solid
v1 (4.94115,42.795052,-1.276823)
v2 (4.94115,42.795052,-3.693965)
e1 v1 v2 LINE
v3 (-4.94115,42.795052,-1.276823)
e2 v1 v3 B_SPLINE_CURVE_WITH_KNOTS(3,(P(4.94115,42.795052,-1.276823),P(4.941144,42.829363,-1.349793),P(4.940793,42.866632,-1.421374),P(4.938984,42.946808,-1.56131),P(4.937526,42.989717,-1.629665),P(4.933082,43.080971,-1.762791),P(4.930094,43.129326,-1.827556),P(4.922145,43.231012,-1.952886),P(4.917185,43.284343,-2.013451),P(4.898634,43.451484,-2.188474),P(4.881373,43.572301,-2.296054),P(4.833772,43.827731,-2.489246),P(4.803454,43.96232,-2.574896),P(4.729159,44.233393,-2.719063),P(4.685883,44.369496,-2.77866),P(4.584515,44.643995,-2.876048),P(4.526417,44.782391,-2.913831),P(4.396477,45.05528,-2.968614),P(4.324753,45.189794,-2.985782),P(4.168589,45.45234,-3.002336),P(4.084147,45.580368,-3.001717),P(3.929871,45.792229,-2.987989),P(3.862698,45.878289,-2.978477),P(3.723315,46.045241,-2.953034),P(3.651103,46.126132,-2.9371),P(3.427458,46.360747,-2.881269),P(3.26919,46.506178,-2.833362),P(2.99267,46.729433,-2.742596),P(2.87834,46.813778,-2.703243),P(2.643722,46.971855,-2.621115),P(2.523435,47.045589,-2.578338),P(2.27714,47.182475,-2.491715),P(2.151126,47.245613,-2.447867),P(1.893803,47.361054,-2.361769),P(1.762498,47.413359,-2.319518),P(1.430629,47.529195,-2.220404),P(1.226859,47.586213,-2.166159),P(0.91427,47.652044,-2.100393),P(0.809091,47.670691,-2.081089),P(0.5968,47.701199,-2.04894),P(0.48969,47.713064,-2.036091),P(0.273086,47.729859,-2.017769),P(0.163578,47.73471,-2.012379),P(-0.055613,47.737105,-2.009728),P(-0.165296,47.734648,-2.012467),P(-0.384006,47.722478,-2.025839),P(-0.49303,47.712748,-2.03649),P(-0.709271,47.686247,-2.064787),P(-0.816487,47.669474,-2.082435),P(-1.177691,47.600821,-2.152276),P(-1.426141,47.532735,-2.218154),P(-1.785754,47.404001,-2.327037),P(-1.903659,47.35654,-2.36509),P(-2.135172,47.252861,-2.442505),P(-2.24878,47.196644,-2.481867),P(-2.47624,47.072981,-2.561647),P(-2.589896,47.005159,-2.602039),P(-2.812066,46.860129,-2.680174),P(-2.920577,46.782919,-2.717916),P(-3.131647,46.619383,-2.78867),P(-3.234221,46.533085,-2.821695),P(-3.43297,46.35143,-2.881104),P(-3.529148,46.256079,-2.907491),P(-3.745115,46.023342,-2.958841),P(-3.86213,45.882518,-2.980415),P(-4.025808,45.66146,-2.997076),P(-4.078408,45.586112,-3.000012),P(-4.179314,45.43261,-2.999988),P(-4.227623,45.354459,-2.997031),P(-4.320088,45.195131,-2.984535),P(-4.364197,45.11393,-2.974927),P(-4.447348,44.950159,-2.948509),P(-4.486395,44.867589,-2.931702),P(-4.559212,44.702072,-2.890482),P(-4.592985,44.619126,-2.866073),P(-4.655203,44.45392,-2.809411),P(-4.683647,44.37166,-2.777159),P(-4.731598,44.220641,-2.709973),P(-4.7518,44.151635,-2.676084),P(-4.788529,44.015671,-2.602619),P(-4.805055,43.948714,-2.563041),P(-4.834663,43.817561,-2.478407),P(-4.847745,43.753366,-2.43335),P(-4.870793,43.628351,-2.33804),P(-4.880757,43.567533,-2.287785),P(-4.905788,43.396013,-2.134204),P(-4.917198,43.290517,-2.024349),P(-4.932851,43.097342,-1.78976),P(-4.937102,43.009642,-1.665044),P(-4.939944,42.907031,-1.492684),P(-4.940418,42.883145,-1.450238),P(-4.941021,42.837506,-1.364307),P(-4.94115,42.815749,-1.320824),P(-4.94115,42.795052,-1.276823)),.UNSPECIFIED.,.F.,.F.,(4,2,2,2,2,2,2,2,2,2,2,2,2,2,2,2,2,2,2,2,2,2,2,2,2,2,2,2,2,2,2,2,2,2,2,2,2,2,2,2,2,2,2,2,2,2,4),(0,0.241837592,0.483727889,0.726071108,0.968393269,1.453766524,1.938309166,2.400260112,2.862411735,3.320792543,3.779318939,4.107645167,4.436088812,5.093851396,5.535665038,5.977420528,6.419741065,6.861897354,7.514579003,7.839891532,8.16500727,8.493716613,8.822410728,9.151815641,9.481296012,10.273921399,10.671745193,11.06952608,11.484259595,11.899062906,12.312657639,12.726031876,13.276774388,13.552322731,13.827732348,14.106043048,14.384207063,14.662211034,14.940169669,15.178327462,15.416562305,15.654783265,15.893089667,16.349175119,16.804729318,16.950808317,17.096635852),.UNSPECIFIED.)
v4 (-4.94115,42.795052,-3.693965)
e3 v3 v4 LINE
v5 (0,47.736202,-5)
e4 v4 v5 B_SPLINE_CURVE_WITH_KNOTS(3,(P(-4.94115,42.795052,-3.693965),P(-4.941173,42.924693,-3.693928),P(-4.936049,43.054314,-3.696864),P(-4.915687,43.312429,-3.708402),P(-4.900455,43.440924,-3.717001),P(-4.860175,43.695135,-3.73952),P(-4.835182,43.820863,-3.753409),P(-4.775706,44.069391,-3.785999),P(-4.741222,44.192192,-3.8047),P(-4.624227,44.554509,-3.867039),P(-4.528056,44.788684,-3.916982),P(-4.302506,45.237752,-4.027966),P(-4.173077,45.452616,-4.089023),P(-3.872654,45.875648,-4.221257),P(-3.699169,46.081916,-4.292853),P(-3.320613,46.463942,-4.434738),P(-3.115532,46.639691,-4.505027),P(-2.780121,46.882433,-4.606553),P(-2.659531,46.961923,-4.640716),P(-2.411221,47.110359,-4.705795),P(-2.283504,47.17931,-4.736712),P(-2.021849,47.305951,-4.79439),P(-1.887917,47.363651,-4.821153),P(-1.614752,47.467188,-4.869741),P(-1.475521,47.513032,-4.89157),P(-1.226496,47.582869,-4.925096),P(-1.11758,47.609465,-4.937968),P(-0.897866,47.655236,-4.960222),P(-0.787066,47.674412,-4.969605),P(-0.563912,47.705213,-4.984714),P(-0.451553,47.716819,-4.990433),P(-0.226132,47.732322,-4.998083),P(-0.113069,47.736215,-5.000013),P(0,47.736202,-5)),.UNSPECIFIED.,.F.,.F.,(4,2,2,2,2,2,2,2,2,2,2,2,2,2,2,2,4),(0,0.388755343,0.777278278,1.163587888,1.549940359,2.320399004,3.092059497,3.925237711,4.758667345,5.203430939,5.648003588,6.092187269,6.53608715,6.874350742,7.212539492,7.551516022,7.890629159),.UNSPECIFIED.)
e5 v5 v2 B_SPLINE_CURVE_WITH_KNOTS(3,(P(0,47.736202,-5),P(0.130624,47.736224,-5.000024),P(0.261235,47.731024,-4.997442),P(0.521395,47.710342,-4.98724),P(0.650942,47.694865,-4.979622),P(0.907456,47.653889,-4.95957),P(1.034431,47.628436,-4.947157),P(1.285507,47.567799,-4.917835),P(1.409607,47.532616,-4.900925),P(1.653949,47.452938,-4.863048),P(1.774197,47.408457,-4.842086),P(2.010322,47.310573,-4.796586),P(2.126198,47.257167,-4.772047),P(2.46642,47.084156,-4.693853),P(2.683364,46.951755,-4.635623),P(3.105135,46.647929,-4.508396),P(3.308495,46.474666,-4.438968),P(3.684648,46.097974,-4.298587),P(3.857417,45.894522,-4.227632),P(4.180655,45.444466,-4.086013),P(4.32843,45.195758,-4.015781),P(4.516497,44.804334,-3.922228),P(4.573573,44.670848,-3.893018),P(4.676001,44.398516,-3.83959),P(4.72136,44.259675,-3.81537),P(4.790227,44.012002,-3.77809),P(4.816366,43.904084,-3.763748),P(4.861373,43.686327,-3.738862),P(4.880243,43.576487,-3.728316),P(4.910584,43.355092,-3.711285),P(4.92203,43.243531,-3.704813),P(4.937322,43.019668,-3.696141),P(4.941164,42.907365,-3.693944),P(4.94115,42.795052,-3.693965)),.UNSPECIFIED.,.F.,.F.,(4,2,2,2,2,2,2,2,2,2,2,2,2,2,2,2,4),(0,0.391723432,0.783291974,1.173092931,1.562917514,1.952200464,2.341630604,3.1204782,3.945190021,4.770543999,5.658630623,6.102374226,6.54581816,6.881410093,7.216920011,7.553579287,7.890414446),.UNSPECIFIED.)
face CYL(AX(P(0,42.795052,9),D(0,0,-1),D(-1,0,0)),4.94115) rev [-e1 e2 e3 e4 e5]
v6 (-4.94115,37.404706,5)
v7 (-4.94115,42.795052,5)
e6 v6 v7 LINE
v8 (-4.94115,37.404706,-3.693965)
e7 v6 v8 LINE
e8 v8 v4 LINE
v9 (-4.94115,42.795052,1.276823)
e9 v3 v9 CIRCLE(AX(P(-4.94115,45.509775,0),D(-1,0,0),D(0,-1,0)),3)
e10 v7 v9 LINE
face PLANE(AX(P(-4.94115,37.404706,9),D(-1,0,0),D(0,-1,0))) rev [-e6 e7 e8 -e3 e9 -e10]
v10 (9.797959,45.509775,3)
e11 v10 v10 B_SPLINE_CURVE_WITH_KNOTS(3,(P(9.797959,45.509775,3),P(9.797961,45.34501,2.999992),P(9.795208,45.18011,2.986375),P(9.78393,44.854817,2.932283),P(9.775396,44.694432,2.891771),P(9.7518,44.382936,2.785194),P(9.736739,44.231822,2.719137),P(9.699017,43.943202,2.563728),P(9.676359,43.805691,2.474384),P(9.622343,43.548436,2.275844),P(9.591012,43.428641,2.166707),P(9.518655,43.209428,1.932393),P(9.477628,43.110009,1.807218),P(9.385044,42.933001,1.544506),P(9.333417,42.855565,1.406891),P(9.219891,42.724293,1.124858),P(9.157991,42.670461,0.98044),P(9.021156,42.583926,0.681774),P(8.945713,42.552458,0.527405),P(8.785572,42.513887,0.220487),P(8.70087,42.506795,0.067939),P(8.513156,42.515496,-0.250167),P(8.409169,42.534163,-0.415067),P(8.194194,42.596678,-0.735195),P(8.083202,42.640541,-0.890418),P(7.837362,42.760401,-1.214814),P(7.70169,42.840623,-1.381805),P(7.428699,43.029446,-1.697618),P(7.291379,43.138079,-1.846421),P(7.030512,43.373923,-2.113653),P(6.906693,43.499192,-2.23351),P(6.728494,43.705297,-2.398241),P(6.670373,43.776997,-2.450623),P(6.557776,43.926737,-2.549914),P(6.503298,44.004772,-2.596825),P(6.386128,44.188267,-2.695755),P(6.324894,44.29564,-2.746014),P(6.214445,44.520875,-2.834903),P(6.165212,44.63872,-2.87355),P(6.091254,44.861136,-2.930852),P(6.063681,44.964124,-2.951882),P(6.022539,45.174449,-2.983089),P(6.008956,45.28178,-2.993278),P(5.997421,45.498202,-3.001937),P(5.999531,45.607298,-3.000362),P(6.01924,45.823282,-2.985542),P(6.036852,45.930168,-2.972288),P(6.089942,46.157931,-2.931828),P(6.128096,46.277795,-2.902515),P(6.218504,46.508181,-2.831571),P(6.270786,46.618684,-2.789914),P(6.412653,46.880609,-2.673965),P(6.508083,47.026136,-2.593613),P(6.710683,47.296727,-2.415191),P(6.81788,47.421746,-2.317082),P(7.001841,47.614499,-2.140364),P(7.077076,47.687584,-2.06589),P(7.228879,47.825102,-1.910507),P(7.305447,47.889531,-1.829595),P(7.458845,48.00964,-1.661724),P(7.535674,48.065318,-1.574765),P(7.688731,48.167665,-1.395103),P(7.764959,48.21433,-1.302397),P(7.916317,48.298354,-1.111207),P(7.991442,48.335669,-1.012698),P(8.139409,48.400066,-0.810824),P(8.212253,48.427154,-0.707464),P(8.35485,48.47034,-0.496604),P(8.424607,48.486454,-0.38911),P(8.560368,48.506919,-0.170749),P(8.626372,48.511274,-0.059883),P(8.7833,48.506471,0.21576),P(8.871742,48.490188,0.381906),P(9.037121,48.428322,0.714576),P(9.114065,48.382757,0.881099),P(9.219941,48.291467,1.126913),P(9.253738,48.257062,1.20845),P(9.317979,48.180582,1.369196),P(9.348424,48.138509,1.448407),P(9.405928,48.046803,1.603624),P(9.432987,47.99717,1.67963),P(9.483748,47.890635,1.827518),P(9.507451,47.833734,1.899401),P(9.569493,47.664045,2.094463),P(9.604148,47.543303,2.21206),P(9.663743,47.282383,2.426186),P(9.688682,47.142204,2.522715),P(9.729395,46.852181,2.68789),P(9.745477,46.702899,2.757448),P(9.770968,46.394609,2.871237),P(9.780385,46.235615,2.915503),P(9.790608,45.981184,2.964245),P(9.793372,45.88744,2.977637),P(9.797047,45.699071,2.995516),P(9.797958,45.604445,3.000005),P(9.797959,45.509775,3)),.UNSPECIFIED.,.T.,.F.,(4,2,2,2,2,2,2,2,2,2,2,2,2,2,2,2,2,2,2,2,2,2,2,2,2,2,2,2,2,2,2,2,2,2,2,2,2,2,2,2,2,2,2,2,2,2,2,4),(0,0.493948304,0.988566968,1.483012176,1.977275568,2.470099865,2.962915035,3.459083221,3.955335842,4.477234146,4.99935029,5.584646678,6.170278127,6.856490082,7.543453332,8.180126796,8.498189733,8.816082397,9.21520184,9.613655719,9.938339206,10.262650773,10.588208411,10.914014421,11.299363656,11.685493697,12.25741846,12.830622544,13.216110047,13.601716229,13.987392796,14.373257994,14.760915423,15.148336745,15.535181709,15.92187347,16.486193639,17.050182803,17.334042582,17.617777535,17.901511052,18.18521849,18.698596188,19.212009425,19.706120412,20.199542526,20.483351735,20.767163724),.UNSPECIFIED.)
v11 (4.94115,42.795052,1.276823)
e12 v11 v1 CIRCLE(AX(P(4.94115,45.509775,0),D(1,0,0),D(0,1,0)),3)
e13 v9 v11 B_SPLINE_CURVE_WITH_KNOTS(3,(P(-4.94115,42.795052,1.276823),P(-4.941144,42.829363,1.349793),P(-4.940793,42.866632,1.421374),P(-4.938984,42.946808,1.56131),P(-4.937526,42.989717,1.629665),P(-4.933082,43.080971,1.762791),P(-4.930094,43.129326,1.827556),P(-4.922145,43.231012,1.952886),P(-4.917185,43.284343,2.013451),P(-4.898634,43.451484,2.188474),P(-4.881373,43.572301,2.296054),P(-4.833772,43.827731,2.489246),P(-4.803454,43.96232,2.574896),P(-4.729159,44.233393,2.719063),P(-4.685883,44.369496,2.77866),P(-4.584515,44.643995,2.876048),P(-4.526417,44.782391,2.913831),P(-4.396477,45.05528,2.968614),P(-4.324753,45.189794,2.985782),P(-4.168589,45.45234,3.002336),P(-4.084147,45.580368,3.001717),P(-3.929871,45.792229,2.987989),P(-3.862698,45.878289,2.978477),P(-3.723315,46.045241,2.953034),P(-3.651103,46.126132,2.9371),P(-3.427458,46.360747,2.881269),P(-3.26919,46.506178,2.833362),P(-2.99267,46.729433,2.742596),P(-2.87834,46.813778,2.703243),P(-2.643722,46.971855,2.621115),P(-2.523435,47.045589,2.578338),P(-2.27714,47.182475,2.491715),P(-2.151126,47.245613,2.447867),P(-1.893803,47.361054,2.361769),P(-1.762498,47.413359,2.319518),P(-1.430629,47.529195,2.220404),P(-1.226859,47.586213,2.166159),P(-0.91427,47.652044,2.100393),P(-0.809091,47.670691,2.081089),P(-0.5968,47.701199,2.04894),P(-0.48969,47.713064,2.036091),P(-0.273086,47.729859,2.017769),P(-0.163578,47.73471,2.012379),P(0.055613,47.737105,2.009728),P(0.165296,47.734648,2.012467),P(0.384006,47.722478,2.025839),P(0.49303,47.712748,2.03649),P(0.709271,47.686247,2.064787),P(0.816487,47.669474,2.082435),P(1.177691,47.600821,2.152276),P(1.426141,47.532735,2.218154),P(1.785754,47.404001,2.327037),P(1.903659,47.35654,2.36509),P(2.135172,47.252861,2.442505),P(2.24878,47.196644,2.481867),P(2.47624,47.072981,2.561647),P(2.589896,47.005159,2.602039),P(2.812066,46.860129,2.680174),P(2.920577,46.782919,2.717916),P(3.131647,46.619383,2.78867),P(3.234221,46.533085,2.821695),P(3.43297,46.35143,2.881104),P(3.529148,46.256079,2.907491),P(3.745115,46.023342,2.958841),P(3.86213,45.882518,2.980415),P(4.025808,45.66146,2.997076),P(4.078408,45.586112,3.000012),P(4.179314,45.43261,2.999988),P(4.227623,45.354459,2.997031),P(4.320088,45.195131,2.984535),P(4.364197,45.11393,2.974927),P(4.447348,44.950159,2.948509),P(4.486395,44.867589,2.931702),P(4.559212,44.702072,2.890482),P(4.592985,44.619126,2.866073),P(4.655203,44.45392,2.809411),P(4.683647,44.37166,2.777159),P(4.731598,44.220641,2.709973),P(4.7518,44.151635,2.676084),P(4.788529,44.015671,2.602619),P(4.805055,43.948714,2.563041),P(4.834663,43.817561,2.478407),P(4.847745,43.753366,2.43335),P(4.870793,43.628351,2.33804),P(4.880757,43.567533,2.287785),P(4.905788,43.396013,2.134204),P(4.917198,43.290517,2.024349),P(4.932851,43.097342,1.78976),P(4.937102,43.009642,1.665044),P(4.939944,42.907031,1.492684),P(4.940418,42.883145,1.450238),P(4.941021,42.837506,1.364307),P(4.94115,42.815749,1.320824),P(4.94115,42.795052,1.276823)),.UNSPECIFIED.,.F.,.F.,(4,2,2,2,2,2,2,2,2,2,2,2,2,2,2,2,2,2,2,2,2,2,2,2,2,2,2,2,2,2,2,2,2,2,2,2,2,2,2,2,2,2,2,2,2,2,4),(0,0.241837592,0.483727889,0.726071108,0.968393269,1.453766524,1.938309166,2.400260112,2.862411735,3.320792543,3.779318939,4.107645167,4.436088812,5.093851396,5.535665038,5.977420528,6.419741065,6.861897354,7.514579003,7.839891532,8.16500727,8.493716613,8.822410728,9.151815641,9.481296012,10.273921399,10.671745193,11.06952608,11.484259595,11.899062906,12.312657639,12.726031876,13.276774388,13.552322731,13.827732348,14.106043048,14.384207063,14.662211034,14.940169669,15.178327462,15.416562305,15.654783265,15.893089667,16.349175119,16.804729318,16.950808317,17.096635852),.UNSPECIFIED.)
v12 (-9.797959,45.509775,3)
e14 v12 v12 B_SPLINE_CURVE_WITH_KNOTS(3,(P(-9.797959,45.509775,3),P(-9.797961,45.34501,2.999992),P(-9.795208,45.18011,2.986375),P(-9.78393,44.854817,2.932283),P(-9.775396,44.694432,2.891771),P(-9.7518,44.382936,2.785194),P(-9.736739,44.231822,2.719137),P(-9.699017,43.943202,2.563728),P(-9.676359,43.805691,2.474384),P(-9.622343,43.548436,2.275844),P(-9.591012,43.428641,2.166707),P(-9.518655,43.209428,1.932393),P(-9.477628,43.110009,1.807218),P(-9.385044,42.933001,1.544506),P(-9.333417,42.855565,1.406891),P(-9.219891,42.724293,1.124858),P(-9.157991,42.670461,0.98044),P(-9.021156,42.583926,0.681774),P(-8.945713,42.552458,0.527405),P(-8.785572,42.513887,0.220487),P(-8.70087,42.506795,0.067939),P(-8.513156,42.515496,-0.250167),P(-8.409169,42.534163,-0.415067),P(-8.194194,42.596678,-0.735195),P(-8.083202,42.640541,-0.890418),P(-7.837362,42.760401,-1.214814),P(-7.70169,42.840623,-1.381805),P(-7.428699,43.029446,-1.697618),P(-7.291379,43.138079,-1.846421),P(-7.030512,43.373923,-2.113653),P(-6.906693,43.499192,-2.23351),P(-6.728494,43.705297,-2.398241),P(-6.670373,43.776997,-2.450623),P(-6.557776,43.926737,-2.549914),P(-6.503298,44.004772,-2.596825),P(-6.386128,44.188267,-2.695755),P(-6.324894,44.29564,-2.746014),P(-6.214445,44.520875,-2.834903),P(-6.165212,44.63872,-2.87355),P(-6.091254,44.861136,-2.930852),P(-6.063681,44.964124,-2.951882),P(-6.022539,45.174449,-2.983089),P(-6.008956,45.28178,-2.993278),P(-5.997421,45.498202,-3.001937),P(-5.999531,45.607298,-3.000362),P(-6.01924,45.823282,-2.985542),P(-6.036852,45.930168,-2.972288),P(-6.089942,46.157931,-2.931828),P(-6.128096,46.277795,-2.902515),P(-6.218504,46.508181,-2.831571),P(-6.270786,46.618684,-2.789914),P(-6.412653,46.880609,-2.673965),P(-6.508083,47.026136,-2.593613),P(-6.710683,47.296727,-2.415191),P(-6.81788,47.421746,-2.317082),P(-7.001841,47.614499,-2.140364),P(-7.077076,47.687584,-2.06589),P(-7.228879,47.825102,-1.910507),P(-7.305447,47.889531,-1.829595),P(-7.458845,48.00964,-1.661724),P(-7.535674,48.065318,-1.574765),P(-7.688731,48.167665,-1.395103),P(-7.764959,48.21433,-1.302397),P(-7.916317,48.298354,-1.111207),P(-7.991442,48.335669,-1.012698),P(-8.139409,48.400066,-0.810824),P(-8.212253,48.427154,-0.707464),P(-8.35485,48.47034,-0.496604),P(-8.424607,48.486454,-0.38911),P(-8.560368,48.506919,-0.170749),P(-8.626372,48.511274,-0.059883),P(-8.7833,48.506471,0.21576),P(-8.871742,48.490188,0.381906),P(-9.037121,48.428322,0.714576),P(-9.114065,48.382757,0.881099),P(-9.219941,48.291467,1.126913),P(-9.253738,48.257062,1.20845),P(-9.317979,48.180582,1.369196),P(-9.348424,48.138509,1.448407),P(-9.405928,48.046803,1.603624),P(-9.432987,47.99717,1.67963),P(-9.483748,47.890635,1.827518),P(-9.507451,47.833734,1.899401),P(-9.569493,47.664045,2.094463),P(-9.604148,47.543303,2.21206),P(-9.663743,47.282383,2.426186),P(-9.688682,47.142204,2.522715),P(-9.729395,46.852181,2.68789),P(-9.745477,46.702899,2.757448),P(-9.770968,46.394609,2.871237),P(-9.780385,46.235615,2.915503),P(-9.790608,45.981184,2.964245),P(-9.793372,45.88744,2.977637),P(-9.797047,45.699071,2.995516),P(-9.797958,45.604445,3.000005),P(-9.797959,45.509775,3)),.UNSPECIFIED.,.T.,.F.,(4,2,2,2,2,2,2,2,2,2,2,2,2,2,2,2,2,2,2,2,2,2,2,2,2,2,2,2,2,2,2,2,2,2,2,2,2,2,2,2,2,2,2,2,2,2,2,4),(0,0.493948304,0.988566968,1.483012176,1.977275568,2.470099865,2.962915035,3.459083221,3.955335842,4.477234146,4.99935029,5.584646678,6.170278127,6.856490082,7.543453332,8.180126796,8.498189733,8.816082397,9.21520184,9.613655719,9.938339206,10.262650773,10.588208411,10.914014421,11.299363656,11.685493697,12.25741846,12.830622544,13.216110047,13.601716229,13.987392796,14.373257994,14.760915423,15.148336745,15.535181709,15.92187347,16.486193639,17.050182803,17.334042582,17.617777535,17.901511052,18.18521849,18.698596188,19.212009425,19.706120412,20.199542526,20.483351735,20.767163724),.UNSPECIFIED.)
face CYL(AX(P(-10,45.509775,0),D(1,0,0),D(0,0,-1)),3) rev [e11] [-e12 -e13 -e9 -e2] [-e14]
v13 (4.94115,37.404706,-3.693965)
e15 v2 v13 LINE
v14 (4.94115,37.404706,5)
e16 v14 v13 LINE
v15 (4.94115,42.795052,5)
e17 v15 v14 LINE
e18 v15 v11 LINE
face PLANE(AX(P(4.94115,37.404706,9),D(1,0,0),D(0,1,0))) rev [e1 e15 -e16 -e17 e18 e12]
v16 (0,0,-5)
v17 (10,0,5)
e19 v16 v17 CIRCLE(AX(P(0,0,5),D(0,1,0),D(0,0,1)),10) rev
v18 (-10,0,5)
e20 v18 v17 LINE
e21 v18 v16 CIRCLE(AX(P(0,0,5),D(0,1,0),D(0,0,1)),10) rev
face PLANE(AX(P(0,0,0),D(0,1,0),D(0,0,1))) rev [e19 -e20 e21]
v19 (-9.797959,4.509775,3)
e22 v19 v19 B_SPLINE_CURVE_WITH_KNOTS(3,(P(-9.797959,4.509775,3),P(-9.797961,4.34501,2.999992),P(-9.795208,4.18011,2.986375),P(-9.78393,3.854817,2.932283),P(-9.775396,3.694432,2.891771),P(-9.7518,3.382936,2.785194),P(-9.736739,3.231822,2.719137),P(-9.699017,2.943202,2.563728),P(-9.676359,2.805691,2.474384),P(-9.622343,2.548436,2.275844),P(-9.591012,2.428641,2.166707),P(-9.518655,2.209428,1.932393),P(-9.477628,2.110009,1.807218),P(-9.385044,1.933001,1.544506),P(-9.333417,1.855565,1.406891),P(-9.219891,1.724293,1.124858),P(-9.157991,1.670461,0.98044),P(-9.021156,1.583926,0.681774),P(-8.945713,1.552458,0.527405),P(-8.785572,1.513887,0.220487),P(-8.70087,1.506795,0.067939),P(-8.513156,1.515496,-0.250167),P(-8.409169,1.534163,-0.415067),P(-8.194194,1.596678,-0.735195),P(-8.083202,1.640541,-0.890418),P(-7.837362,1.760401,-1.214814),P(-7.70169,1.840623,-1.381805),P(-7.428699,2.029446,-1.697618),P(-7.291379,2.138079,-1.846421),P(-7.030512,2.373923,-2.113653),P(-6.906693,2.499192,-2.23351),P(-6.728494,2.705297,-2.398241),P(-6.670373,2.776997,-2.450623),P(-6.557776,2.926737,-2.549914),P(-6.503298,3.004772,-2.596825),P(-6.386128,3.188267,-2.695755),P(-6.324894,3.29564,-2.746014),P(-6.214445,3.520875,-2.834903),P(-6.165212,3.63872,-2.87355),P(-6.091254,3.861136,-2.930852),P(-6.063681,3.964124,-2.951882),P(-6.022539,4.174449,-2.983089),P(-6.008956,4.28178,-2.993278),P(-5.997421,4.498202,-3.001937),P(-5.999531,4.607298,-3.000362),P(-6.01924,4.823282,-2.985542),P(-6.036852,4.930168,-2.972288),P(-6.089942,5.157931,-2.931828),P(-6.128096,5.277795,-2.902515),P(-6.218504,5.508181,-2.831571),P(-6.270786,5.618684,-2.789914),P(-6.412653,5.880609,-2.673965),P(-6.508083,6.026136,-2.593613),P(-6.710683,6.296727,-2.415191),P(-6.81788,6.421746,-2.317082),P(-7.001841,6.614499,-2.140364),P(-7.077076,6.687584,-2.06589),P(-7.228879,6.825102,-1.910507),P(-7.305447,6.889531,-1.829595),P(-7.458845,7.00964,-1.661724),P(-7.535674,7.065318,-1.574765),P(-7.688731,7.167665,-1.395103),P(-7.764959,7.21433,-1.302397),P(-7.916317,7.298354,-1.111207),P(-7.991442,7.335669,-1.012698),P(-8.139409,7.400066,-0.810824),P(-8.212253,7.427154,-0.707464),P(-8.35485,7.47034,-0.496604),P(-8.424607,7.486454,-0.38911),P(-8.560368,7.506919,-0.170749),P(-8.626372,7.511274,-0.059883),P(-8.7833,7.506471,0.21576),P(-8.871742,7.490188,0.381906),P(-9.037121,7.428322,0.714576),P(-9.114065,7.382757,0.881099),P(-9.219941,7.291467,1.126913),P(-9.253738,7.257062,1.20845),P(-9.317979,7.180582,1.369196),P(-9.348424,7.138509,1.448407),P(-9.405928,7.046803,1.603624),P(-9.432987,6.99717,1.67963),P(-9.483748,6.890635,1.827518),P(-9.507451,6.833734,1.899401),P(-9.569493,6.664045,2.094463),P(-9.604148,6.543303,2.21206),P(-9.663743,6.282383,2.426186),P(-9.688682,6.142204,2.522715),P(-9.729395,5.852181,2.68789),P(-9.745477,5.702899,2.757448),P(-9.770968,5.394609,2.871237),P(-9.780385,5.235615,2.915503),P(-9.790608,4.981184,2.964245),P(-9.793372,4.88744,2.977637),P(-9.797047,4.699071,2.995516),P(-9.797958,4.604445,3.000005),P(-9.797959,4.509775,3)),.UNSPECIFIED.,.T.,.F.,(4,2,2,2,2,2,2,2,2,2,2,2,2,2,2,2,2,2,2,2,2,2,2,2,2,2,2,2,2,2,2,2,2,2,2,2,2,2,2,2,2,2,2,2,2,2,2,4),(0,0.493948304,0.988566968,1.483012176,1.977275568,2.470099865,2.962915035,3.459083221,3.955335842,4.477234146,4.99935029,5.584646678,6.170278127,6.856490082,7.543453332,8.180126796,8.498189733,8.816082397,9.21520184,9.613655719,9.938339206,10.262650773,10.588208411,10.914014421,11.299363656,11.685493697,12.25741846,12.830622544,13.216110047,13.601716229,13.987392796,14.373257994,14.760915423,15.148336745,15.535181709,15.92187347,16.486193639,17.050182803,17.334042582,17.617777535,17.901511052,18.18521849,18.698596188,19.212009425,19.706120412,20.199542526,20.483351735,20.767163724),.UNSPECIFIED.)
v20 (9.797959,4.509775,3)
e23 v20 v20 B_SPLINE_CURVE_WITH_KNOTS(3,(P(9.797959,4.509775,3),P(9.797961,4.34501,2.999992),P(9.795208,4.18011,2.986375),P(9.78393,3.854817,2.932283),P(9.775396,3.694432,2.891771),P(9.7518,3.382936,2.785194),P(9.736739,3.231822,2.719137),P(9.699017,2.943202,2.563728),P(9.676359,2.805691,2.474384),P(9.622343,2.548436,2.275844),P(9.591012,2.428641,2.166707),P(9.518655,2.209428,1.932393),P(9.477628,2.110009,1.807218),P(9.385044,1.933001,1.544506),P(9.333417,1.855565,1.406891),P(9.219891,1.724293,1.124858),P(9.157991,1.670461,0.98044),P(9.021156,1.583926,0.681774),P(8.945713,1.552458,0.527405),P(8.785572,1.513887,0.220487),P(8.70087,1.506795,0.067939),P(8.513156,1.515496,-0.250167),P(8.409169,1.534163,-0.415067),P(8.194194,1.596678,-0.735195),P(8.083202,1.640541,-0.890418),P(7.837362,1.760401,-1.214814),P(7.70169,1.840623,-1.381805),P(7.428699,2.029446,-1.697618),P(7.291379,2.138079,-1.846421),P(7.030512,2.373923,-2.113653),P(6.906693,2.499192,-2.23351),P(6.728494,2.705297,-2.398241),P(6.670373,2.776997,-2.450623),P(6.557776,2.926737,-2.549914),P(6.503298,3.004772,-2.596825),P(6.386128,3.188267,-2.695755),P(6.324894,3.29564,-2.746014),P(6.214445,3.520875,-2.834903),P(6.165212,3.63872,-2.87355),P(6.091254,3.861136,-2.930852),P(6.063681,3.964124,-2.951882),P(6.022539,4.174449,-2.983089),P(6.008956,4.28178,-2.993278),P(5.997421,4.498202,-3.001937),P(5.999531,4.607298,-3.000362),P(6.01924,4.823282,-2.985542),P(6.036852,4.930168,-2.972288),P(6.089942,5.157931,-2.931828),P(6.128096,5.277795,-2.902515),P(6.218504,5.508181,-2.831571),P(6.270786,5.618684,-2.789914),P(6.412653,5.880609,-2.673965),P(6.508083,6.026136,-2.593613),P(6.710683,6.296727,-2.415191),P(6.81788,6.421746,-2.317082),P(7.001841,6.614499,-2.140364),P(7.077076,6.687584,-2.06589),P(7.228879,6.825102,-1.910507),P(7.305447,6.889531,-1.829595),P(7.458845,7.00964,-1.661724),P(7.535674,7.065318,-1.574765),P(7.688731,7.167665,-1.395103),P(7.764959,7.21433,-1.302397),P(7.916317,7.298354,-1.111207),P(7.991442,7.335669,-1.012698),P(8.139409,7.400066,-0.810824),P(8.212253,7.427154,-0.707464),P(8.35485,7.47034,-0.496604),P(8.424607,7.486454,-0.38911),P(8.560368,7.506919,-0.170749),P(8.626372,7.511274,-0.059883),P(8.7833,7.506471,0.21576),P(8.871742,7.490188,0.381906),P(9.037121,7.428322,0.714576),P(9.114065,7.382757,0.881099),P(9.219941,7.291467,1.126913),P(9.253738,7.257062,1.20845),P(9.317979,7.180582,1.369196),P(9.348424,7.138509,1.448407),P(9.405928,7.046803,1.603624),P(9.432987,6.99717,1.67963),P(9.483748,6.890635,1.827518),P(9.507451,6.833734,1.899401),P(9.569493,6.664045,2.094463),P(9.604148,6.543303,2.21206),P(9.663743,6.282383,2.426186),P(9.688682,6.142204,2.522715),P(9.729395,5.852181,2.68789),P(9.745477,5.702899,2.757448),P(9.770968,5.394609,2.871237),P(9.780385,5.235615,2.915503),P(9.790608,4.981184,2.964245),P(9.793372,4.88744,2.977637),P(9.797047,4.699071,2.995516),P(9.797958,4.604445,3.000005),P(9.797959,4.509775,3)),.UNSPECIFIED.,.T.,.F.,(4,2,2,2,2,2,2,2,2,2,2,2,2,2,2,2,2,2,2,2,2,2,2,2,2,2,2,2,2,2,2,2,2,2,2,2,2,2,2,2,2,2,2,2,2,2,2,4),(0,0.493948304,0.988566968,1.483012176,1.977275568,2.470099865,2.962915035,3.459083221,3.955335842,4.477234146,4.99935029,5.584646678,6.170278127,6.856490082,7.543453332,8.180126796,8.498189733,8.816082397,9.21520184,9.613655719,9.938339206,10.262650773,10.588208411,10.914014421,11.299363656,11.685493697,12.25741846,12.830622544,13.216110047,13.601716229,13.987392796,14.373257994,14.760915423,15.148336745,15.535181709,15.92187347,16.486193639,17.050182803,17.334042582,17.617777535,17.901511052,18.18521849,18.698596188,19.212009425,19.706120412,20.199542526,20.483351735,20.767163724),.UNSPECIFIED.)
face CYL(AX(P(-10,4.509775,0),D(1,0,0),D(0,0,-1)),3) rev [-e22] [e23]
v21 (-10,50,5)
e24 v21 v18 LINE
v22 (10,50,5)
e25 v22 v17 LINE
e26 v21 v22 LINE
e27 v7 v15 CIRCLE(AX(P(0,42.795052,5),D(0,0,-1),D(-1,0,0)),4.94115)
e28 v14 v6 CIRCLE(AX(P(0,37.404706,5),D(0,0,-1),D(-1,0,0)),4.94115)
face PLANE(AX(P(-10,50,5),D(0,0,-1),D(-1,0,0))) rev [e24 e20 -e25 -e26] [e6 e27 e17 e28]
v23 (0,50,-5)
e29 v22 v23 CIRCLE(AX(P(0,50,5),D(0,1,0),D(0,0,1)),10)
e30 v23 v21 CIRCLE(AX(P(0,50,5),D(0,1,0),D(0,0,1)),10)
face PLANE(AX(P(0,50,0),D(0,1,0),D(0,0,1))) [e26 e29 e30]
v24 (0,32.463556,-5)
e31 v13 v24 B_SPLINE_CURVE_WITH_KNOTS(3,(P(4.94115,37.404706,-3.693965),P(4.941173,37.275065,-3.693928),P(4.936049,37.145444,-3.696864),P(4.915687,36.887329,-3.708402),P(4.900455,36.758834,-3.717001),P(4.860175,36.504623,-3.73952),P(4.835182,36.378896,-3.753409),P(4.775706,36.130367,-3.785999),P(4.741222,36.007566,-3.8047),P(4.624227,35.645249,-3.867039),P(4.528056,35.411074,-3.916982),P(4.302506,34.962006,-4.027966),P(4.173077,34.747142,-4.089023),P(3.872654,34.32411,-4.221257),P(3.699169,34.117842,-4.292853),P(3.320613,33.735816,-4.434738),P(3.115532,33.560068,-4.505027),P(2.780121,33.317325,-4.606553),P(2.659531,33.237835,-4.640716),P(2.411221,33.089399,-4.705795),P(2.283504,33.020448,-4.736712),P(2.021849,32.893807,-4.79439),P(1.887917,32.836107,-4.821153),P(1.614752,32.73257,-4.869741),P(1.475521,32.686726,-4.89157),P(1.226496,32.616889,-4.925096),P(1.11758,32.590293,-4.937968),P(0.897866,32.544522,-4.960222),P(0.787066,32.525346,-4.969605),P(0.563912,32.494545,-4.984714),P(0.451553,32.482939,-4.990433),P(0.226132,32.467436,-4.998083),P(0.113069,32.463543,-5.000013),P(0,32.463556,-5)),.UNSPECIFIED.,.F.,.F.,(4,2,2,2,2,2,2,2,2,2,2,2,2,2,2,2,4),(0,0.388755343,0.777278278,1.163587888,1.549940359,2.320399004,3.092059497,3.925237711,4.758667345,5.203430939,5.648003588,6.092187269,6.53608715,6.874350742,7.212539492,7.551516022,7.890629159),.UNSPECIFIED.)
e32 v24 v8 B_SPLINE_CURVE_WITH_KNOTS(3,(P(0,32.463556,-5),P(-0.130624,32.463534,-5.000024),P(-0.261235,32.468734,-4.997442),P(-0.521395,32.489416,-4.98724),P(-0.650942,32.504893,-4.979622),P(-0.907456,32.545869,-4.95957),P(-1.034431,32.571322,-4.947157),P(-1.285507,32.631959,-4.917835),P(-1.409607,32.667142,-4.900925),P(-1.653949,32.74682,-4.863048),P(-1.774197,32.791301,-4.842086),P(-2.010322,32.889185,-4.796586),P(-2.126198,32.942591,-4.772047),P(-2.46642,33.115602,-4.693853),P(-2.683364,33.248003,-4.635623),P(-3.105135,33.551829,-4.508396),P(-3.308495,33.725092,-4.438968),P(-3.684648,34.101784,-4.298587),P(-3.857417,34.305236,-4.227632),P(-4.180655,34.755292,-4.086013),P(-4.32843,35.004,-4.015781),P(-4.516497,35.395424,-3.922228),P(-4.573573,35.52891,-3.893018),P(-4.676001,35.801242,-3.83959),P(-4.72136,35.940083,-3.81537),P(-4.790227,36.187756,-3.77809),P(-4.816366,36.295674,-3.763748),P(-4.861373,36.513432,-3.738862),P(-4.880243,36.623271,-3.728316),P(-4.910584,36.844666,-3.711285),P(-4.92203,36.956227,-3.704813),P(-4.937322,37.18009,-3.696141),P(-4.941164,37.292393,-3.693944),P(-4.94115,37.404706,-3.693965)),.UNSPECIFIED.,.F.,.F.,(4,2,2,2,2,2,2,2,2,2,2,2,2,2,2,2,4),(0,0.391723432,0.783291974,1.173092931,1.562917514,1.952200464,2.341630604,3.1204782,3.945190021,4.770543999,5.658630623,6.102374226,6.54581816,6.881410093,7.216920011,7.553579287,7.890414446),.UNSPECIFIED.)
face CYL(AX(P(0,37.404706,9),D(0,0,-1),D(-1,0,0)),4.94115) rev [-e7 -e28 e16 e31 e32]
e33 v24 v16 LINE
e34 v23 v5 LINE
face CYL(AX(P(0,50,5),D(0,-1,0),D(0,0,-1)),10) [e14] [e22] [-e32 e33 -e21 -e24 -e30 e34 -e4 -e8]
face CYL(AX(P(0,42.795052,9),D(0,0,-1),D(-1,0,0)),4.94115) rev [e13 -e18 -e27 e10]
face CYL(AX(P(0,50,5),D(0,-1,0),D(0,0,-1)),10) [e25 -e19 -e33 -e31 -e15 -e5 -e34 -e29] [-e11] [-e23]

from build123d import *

# Parameters (mm, degrees)
SKETCH1_W           = 20
SKETCH1_H           = 10
BOSS_EXTRUDE1_DEPTH = 50
SKETCH2_R           = 3
CUT_EXTRUDE1_DEPTH  = 55.083269132
CUT_EXTRUDE2_DEPTH  = 14
LPATTERN1_COUNT     = 2
LPATTERN1_PITCH     = 41
FILLET1_DEPTH       = 50


with BuildPart() as part:
    # Sketch1 → Boss-Extrude1 (new body)
    with BuildSketch(Plane(origin=(0, 0, 0), x_dir=(1, 0, 0), z_dir=(0, 1, 0))):
        Rectangle(SKETCH1_W, SKETCH1_H)
    extrude(amount=BOSS_EXTRUDE1_DEPTH)

    # Sketch2 → Cut-Extrude1 (cut, through all)
    with BuildSketch(Plane(origin=(10, 0, 0), x_dir=(0, 0, -1), z_dir=(1, 0, 0))):
        with Locations((0, 4.509775146)):
            Circle(SKETCH2_R)
    cut_extrude1 = extrude(amount=-CUT_EXTRUDE1_DEPTH, mode=Mode.SUBTRACT)

    # Sketch3 → Cut-Extrude2 (cut)
    with BuildSketch(Plane(origin=(0, 0, -5), x_dir=(-1, 0, 0), z_dir=(0, 0, -1))):
        with BuildLine():
            Line((-4.941150344, 37.404706109), (-4.941150344, 42.795051939))
            ThreePointArc((-4.941150344, 42.795051939), (0, 47.736202283), (4.941150344, 42.795051939))
            Line((4.941150344, 42.795051939), (4.941150344, 37.404706109))
            ThreePointArc((4.941150344, 37.404706109), (0, 32.463555765), (-4.941150344, 37.404706109))
        make_face()
    extrude(amount=-CUT_EXTRUDE2_DEPTH, mode=Mode.SUBTRACT)

    # LPattern1: Cut-Extrude1 ×2
    with Locations(*[(0, i * LPATTERN1_PITCH, 0) for i in range(1, LPATTERN1_COUNT)]):
        add(cut_extrude1, mode=Mode.SUBTRACT)

    # Fillet1: read off the stored shape, not the designer's step
    # Fillet1 outline → Fillet1 (cut)
    with BuildSketch(Plane(origin=(0, 0, 0), x_dir=(1, 0, 0), z_dir=(0, 1, 0))):
        with BuildLine():
            ThreePointArc((0, 5), (7.071067812, 2.071067812), (10, -5))
            Line((10, -5), (10, 5))
            Line((10, 5), (0, 5))
        make_face()
        with BuildLine():
            Line((0, 5), (-10, 5))
            Line((-10, 5), (-10, -5))
            ThreePointArc((-10, -5), (-7.071067812, 2.071067812), (0, 5))
        make_face()
    extrude(amount=FILLET1_DEPTH, mode=Mode.SUBTRACT)


solid = part.part
